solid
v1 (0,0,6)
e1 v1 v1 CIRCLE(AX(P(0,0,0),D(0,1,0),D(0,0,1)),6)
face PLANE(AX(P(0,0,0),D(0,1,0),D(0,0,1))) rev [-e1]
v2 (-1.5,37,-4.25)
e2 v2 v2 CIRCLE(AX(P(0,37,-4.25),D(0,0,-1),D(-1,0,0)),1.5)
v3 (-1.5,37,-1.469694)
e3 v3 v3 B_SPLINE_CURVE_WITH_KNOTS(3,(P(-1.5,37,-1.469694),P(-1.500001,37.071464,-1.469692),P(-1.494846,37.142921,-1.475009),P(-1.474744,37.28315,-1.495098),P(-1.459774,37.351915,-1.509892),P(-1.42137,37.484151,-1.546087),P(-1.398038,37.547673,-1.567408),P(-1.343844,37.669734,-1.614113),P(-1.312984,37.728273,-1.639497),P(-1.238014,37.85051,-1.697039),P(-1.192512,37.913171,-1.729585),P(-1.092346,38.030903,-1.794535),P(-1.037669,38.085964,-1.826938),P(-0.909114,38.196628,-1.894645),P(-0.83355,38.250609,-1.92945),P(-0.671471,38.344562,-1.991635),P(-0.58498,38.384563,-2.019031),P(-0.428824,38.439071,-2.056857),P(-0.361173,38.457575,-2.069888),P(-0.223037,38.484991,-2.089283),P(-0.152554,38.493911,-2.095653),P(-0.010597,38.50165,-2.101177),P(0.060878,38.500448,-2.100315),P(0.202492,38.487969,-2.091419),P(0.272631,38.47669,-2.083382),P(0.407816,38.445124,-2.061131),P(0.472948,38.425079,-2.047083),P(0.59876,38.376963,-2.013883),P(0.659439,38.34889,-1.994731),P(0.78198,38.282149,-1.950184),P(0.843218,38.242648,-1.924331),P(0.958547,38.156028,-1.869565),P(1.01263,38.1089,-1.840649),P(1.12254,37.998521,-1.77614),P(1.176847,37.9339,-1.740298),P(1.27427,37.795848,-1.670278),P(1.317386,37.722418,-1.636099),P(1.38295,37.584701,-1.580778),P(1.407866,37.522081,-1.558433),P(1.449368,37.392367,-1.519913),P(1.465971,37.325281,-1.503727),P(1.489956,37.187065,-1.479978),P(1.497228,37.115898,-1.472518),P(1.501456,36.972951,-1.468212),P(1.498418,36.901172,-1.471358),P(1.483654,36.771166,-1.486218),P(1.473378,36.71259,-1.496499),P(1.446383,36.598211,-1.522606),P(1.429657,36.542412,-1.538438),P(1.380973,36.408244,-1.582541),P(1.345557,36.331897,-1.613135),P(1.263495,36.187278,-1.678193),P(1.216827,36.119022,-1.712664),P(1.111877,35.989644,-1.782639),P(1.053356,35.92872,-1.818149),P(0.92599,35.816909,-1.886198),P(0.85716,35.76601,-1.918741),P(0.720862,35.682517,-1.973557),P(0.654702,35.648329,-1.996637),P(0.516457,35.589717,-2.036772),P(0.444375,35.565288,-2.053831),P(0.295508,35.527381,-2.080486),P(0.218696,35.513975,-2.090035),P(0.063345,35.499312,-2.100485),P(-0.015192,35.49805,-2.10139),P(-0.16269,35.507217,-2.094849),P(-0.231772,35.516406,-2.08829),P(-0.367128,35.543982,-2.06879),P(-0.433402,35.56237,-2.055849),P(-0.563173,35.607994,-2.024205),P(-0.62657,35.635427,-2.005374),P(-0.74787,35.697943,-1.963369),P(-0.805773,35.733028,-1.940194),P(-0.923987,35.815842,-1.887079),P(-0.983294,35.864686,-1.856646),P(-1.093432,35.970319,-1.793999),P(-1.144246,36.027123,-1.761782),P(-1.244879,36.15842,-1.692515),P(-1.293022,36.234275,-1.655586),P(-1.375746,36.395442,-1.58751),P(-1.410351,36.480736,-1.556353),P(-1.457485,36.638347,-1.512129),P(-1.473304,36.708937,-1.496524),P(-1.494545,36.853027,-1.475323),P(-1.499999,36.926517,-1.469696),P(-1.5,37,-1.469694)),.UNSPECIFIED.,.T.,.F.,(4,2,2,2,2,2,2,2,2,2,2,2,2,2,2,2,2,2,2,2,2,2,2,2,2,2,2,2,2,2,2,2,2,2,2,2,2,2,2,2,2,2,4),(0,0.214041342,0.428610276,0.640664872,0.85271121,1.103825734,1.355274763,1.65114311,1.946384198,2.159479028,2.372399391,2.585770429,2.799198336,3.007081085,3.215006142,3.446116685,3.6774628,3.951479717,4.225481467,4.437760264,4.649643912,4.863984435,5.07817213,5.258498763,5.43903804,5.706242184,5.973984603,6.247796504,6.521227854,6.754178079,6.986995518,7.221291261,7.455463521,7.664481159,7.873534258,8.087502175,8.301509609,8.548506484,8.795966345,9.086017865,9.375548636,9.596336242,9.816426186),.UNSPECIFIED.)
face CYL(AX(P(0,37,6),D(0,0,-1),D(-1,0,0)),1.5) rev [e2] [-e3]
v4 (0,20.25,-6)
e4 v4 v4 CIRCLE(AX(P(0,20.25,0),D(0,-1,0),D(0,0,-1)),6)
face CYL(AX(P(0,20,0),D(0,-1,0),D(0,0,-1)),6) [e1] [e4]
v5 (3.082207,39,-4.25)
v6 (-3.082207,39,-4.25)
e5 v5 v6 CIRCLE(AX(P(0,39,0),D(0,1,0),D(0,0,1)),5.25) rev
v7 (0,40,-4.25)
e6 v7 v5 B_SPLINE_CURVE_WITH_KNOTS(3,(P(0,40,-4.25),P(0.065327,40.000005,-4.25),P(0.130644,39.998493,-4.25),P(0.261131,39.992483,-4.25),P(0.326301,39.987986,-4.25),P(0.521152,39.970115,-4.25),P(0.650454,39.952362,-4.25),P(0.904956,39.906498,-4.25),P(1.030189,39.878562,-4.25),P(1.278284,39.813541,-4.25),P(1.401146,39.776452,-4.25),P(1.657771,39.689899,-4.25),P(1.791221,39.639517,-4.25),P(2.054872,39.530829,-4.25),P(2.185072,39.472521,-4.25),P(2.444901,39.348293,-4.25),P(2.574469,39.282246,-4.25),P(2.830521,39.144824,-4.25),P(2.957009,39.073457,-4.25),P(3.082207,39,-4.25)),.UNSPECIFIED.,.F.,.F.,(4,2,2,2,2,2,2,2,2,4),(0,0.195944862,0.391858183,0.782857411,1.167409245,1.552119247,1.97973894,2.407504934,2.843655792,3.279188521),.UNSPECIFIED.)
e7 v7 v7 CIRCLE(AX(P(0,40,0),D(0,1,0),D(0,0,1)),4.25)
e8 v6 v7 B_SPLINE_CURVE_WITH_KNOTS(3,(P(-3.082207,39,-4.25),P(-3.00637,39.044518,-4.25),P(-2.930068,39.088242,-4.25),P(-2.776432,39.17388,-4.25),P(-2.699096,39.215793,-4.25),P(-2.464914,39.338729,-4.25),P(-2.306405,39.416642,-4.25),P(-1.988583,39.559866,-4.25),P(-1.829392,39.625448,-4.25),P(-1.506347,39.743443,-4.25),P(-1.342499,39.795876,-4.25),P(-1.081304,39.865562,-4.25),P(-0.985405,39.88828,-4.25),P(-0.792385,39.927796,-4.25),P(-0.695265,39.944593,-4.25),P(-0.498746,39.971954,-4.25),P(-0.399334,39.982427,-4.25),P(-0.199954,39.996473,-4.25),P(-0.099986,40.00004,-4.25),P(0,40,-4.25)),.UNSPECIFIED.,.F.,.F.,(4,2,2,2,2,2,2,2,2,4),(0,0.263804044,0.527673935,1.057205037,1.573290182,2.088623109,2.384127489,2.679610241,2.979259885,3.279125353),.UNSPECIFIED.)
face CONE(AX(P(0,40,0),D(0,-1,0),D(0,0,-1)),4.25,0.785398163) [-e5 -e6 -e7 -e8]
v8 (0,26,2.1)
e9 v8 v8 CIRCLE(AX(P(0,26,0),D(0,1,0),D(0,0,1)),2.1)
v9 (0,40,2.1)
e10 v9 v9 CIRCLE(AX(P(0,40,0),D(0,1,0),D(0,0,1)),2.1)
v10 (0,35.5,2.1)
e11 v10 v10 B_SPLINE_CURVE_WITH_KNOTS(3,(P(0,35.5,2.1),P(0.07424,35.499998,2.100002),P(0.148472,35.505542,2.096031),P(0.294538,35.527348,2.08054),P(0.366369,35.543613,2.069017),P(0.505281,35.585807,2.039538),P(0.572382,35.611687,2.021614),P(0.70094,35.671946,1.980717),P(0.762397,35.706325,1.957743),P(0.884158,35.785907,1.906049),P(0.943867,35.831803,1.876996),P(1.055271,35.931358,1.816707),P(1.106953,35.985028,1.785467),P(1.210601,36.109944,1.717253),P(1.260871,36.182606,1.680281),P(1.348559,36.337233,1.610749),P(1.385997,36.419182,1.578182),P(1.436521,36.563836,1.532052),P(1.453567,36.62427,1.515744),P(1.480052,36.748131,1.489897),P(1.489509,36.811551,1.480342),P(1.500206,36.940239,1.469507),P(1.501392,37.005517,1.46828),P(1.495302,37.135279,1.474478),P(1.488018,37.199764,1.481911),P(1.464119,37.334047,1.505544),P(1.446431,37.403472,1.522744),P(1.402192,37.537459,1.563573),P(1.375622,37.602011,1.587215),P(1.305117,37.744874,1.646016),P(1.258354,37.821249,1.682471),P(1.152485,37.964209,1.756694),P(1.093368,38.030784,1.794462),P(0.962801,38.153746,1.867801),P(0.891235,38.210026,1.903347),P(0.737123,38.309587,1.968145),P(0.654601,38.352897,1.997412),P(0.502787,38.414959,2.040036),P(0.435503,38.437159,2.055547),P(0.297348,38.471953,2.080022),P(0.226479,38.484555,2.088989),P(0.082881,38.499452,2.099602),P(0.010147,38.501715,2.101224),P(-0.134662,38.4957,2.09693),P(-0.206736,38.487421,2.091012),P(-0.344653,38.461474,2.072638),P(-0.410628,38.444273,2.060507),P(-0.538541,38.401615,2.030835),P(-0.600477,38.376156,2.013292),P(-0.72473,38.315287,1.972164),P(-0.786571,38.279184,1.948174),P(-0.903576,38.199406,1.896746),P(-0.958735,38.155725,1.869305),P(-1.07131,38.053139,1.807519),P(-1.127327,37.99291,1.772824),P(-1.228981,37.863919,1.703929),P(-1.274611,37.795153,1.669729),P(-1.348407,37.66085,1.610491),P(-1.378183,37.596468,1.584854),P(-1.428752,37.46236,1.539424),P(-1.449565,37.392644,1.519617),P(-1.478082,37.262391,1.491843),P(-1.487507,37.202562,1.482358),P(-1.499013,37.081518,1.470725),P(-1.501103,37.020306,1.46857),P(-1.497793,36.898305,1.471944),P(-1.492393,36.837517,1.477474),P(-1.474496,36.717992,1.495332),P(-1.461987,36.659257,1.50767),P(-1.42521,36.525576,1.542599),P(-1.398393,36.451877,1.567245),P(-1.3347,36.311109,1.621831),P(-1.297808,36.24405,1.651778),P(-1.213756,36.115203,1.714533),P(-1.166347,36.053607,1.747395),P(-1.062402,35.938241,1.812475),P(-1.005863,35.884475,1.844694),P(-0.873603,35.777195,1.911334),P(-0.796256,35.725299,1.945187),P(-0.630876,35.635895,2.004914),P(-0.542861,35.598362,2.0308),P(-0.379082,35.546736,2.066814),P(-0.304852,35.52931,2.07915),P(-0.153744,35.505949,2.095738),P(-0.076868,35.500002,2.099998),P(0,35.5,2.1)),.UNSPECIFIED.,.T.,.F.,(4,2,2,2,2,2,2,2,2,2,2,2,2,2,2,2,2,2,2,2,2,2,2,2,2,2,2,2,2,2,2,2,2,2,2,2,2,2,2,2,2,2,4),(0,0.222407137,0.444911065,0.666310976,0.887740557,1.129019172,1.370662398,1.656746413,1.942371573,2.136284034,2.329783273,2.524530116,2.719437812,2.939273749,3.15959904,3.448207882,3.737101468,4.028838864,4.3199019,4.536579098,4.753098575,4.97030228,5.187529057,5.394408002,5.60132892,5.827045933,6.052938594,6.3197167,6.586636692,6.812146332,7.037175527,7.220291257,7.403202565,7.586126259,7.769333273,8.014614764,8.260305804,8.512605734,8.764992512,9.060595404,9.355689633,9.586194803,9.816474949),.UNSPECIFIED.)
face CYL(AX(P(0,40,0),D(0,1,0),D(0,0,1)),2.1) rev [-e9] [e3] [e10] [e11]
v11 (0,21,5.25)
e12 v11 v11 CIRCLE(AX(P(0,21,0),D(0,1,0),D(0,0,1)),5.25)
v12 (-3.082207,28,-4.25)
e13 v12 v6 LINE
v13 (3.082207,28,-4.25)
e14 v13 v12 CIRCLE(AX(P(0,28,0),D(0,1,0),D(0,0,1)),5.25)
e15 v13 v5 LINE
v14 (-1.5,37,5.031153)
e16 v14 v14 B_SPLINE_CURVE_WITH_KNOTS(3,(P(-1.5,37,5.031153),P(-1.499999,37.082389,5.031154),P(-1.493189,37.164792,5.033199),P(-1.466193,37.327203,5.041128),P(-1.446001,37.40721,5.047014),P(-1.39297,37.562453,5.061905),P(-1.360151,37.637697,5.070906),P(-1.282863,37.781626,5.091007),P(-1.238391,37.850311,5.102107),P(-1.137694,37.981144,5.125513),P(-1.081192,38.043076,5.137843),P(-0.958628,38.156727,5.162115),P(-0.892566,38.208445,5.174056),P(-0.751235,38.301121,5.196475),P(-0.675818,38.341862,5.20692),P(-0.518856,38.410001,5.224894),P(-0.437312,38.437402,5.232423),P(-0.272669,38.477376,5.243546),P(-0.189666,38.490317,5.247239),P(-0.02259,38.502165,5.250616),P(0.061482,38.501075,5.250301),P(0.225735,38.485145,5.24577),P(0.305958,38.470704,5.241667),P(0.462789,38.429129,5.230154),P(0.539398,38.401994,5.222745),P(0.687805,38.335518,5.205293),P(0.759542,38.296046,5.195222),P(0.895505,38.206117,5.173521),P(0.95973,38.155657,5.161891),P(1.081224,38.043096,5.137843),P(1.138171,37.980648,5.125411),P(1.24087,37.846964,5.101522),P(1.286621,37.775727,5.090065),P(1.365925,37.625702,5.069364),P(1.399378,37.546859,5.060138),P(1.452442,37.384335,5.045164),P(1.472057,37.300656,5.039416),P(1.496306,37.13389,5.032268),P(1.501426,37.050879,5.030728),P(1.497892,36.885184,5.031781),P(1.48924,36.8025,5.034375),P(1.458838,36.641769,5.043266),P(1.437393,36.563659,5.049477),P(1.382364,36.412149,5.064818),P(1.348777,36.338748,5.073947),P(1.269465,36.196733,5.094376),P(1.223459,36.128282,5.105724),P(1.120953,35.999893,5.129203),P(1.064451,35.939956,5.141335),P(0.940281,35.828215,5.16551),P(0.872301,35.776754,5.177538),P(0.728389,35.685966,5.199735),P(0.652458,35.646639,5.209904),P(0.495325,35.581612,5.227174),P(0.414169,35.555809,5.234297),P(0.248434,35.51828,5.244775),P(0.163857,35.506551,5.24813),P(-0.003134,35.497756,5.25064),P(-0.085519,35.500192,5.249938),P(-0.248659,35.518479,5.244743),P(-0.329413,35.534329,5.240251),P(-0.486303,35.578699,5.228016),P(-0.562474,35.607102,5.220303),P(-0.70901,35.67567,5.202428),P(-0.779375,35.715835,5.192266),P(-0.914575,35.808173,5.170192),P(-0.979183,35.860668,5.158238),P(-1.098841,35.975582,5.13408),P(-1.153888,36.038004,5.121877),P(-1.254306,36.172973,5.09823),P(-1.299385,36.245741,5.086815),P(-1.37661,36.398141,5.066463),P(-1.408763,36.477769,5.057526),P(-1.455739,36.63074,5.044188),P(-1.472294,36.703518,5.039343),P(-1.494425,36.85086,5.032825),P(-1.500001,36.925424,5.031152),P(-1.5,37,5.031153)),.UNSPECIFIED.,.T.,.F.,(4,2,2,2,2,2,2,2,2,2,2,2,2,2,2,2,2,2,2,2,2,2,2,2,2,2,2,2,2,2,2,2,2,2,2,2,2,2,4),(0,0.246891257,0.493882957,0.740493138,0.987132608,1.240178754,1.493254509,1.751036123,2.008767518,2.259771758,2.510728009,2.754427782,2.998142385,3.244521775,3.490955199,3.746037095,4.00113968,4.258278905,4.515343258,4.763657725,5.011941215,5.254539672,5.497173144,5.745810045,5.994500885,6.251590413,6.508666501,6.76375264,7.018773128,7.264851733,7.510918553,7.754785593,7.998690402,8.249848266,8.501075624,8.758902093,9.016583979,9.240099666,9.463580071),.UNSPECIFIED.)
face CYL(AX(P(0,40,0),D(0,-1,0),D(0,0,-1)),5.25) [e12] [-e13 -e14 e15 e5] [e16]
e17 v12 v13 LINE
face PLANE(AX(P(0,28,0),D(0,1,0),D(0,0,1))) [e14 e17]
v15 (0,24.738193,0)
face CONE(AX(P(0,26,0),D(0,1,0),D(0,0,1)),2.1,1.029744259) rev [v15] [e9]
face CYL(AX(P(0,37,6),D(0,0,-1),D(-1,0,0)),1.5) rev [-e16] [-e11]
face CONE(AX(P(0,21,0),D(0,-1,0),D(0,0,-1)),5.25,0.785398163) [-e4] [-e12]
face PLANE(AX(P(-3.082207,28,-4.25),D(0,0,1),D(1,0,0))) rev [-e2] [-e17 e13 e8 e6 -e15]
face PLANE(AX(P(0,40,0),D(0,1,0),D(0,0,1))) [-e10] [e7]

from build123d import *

# Parameters (mm, degrees)
SKETCH1_R             = 6
BOSS_EXTRUDE1_DEPTH   = 20
SKETCH2_R             = 5.25
BOSS_EXTRUDE2_DEPTH   = 20
CUT_EXTRUDE1_START    = -12
CUT_EXTRUDE1_DEPTH    = 12
M5_TAPPED_HOLE1_D     = 4.2
M5_TAPPED_HOLE1_DEPTH = 14
M5_TAPPED_HOLE1_TIP   = 1.2618073
SKETCH6_R             = 1.5
CUT_EXTRUDE2_DEPTH    = 42.72604103


with BuildPart() as part:
    # Sketch1 → Boss-Extrude1 (new body)
    with BuildSketch(Plane(origin=(0, 0, 0), x_dir=(1, 0, 0), z_dir=(0, 1, 0))):
        with Locations(Location((0, 0, 0), (0, 0, 270))):
            Circle(SKETCH1_R)
    extrude(amount=BOSS_EXTRUDE1_DEPTH)

    # Sketch2 → Boss-Extrude2 (add)
    with BuildSketch(Plane(origin=(0, 20, 0), x_dir=(1, 0, 0), z_dir=(0, 1, 0))):
        with Locations(Location((0, 0, 0), (0, 0, 270))):
            Circle(SKETCH2_R)
    extrude(amount=BOSS_EXTRUDE2_DEPTH)

    # Sketch3 → Cut-Extrude1 (cut)
    with BuildSketch(Plane(origin=(0, 40, 0), x_dir=(1, 0, 0), z_dir=(0, 1, 0)).offset(CUT_EXTRUDE1_START)):
        with BuildLine():
            Line((-3.082207001, 4.25), (3.082207001, 4.25))
            ThreePointArc((3.082207001, 4.25), (0, 5.25), (-3.082207001, 4.25))
        make_face()
    extrude(amount=CUT_EXTRUDE1_DEPTH, mode=Mode.SUBTRACT)

    # M5 Tapped Hole1
    with Locations(Plane(origin=(0, 40, 0), x_dir=(1, 0, 0), z_dir=(0, 1, 0))):
        with Locations((0, 0)):
            Hole(M5_TAPPED_HOLE1_D / 2, depth=M5_TAPPED_HOLE1_DEPTH)
            with Locations((0, 0, -(M5_TAPPED_HOLE1_DEPTH + M5_TAPPED_HOLE1_TIP / 2))):  # 118° drill point
                Cone(0, M5_TAPPED_HOLE1_D / 2, M5_TAPPED_HOLE1_TIP, mode=Mode.SUBTRACT)

    # Sketch6 → Cut-Extrude2 (cut, through all)
    with BuildSketch(Plane(origin=(0, 0, -4.25), x_dir=(-1, 0, 0), z_dir=(0, 0, -1))):
        with Locations((0, 37)):
            Circle(SKETCH6_R)
    extrude(amount=-CUT_EXTRUDE2_DEPTH, mode=Mode.SUBTRACT)

    # Chamfer1
    # the kernel refuses this chamfer: 1 mm, written as the material it adds along each edge
    with BuildSketch(Plane(origin=(0, 20, 0), x_dir=(0, 0, 1), z_dir=(-1, 0, 0))) as chamfer1_piece_1_section:
        with BuildLine():
            Line((6.278284271, -0.028284271), (5.221715729, 1.028284271))
            Line((5.221715729, 1.028284271), (5.201715729, 1.028284271))
            ThreePointArc((5.201715729, 1.028284271), (5.23, 0.514142136), (5.23, 0))
            Line((5.23, 0), (5.25, -0.02))
            ThreePointArc((5.25, -0.02), (5.764142136, -0.02), (6.278284271, -0.048284271))
            Line((6.278284271, -0.048284271), (6.278284271, -0.028284271))
        make_face()
    chamfer1_piece_1 = revolve(axis=Axis((0, 20, 0), (0, 1, 0)), mode=Mode.PRIVATE)
    chamfer1_piece_1 = chamfer1_piece_1 & Plane(origin=(0, 20.620713895, 0), x_dir=(0, 0, 1), z_dir=(0, -1, 0)) * Cylinder(6, 26, mode=Mode.PRIVATE)
    add(chamfer1_piece_1)
    # the kernel refuses this chamfer: 1 mm, written as the material it takes off along each edge
    with BuildSketch(Plane(origin=(0, 40, 0), x_dir=(0.522159484326456, 0, -0.8528478603642795), z_dir=(0.8528478603642795, 0, 0.522159484326456))) as chamfer1_2_piece_1:
        with BuildLine():
            Line((5.278284271, -1.028284271), (4.221715729, 0.028284271))
            Line((4.221715729, 0.028284271), (4.221715729, 0.048284271))
            ThreePointArc((4.221715729, 0.048284271), (4.735857864, 0.02), (5.25, 0.02))
            Line((5.25, 0.02), (5.27, 0))
            ThreePointArc((5.27, 0), (5.27, -0.514142136), (5.298284271, -1.028284271))
            Line((5.298284271, -1.028284271), (5.278284271, -1.028284271))
        make_face()
    revolve(axis=Axis((0, 40, 0), (0, 1, 0)), revolution_arc=211.477217225, mode=Mode.SUBTRACT)
    with BuildSketch(Plane(origin=(0, 40, 0), x_dir=(0, 0, 1), z_dir=(-1, 0, 0))) as chamfer1_2_piece_2:
        with BuildLine():
            Line((5.278284271, -1.028284271), (4.221715729, 0.028284271))
            Line((4.221715729, 0.028284271), (4.221715729, 0.048284271))
            ThreePointArc((4.221715729, 0.048284271), (4.735857864, 0.02), (5.25, 0.02))
            Line((5.25, 0.02), (5.27, 0))
            ThreePointArc((5.27, 0), (5.27, -0.514142136), (5.298284271, -1.028284271))
            Line((5.298284271, -1.028284271), (5.278284271, -1.028284271))
        make_face()
    revolve(axis=Axis((0, 40, 0), (0, 1, 0)), revolution_arc=211.477217225, mode=Mode.SUBTRACT)


solid = part.part
